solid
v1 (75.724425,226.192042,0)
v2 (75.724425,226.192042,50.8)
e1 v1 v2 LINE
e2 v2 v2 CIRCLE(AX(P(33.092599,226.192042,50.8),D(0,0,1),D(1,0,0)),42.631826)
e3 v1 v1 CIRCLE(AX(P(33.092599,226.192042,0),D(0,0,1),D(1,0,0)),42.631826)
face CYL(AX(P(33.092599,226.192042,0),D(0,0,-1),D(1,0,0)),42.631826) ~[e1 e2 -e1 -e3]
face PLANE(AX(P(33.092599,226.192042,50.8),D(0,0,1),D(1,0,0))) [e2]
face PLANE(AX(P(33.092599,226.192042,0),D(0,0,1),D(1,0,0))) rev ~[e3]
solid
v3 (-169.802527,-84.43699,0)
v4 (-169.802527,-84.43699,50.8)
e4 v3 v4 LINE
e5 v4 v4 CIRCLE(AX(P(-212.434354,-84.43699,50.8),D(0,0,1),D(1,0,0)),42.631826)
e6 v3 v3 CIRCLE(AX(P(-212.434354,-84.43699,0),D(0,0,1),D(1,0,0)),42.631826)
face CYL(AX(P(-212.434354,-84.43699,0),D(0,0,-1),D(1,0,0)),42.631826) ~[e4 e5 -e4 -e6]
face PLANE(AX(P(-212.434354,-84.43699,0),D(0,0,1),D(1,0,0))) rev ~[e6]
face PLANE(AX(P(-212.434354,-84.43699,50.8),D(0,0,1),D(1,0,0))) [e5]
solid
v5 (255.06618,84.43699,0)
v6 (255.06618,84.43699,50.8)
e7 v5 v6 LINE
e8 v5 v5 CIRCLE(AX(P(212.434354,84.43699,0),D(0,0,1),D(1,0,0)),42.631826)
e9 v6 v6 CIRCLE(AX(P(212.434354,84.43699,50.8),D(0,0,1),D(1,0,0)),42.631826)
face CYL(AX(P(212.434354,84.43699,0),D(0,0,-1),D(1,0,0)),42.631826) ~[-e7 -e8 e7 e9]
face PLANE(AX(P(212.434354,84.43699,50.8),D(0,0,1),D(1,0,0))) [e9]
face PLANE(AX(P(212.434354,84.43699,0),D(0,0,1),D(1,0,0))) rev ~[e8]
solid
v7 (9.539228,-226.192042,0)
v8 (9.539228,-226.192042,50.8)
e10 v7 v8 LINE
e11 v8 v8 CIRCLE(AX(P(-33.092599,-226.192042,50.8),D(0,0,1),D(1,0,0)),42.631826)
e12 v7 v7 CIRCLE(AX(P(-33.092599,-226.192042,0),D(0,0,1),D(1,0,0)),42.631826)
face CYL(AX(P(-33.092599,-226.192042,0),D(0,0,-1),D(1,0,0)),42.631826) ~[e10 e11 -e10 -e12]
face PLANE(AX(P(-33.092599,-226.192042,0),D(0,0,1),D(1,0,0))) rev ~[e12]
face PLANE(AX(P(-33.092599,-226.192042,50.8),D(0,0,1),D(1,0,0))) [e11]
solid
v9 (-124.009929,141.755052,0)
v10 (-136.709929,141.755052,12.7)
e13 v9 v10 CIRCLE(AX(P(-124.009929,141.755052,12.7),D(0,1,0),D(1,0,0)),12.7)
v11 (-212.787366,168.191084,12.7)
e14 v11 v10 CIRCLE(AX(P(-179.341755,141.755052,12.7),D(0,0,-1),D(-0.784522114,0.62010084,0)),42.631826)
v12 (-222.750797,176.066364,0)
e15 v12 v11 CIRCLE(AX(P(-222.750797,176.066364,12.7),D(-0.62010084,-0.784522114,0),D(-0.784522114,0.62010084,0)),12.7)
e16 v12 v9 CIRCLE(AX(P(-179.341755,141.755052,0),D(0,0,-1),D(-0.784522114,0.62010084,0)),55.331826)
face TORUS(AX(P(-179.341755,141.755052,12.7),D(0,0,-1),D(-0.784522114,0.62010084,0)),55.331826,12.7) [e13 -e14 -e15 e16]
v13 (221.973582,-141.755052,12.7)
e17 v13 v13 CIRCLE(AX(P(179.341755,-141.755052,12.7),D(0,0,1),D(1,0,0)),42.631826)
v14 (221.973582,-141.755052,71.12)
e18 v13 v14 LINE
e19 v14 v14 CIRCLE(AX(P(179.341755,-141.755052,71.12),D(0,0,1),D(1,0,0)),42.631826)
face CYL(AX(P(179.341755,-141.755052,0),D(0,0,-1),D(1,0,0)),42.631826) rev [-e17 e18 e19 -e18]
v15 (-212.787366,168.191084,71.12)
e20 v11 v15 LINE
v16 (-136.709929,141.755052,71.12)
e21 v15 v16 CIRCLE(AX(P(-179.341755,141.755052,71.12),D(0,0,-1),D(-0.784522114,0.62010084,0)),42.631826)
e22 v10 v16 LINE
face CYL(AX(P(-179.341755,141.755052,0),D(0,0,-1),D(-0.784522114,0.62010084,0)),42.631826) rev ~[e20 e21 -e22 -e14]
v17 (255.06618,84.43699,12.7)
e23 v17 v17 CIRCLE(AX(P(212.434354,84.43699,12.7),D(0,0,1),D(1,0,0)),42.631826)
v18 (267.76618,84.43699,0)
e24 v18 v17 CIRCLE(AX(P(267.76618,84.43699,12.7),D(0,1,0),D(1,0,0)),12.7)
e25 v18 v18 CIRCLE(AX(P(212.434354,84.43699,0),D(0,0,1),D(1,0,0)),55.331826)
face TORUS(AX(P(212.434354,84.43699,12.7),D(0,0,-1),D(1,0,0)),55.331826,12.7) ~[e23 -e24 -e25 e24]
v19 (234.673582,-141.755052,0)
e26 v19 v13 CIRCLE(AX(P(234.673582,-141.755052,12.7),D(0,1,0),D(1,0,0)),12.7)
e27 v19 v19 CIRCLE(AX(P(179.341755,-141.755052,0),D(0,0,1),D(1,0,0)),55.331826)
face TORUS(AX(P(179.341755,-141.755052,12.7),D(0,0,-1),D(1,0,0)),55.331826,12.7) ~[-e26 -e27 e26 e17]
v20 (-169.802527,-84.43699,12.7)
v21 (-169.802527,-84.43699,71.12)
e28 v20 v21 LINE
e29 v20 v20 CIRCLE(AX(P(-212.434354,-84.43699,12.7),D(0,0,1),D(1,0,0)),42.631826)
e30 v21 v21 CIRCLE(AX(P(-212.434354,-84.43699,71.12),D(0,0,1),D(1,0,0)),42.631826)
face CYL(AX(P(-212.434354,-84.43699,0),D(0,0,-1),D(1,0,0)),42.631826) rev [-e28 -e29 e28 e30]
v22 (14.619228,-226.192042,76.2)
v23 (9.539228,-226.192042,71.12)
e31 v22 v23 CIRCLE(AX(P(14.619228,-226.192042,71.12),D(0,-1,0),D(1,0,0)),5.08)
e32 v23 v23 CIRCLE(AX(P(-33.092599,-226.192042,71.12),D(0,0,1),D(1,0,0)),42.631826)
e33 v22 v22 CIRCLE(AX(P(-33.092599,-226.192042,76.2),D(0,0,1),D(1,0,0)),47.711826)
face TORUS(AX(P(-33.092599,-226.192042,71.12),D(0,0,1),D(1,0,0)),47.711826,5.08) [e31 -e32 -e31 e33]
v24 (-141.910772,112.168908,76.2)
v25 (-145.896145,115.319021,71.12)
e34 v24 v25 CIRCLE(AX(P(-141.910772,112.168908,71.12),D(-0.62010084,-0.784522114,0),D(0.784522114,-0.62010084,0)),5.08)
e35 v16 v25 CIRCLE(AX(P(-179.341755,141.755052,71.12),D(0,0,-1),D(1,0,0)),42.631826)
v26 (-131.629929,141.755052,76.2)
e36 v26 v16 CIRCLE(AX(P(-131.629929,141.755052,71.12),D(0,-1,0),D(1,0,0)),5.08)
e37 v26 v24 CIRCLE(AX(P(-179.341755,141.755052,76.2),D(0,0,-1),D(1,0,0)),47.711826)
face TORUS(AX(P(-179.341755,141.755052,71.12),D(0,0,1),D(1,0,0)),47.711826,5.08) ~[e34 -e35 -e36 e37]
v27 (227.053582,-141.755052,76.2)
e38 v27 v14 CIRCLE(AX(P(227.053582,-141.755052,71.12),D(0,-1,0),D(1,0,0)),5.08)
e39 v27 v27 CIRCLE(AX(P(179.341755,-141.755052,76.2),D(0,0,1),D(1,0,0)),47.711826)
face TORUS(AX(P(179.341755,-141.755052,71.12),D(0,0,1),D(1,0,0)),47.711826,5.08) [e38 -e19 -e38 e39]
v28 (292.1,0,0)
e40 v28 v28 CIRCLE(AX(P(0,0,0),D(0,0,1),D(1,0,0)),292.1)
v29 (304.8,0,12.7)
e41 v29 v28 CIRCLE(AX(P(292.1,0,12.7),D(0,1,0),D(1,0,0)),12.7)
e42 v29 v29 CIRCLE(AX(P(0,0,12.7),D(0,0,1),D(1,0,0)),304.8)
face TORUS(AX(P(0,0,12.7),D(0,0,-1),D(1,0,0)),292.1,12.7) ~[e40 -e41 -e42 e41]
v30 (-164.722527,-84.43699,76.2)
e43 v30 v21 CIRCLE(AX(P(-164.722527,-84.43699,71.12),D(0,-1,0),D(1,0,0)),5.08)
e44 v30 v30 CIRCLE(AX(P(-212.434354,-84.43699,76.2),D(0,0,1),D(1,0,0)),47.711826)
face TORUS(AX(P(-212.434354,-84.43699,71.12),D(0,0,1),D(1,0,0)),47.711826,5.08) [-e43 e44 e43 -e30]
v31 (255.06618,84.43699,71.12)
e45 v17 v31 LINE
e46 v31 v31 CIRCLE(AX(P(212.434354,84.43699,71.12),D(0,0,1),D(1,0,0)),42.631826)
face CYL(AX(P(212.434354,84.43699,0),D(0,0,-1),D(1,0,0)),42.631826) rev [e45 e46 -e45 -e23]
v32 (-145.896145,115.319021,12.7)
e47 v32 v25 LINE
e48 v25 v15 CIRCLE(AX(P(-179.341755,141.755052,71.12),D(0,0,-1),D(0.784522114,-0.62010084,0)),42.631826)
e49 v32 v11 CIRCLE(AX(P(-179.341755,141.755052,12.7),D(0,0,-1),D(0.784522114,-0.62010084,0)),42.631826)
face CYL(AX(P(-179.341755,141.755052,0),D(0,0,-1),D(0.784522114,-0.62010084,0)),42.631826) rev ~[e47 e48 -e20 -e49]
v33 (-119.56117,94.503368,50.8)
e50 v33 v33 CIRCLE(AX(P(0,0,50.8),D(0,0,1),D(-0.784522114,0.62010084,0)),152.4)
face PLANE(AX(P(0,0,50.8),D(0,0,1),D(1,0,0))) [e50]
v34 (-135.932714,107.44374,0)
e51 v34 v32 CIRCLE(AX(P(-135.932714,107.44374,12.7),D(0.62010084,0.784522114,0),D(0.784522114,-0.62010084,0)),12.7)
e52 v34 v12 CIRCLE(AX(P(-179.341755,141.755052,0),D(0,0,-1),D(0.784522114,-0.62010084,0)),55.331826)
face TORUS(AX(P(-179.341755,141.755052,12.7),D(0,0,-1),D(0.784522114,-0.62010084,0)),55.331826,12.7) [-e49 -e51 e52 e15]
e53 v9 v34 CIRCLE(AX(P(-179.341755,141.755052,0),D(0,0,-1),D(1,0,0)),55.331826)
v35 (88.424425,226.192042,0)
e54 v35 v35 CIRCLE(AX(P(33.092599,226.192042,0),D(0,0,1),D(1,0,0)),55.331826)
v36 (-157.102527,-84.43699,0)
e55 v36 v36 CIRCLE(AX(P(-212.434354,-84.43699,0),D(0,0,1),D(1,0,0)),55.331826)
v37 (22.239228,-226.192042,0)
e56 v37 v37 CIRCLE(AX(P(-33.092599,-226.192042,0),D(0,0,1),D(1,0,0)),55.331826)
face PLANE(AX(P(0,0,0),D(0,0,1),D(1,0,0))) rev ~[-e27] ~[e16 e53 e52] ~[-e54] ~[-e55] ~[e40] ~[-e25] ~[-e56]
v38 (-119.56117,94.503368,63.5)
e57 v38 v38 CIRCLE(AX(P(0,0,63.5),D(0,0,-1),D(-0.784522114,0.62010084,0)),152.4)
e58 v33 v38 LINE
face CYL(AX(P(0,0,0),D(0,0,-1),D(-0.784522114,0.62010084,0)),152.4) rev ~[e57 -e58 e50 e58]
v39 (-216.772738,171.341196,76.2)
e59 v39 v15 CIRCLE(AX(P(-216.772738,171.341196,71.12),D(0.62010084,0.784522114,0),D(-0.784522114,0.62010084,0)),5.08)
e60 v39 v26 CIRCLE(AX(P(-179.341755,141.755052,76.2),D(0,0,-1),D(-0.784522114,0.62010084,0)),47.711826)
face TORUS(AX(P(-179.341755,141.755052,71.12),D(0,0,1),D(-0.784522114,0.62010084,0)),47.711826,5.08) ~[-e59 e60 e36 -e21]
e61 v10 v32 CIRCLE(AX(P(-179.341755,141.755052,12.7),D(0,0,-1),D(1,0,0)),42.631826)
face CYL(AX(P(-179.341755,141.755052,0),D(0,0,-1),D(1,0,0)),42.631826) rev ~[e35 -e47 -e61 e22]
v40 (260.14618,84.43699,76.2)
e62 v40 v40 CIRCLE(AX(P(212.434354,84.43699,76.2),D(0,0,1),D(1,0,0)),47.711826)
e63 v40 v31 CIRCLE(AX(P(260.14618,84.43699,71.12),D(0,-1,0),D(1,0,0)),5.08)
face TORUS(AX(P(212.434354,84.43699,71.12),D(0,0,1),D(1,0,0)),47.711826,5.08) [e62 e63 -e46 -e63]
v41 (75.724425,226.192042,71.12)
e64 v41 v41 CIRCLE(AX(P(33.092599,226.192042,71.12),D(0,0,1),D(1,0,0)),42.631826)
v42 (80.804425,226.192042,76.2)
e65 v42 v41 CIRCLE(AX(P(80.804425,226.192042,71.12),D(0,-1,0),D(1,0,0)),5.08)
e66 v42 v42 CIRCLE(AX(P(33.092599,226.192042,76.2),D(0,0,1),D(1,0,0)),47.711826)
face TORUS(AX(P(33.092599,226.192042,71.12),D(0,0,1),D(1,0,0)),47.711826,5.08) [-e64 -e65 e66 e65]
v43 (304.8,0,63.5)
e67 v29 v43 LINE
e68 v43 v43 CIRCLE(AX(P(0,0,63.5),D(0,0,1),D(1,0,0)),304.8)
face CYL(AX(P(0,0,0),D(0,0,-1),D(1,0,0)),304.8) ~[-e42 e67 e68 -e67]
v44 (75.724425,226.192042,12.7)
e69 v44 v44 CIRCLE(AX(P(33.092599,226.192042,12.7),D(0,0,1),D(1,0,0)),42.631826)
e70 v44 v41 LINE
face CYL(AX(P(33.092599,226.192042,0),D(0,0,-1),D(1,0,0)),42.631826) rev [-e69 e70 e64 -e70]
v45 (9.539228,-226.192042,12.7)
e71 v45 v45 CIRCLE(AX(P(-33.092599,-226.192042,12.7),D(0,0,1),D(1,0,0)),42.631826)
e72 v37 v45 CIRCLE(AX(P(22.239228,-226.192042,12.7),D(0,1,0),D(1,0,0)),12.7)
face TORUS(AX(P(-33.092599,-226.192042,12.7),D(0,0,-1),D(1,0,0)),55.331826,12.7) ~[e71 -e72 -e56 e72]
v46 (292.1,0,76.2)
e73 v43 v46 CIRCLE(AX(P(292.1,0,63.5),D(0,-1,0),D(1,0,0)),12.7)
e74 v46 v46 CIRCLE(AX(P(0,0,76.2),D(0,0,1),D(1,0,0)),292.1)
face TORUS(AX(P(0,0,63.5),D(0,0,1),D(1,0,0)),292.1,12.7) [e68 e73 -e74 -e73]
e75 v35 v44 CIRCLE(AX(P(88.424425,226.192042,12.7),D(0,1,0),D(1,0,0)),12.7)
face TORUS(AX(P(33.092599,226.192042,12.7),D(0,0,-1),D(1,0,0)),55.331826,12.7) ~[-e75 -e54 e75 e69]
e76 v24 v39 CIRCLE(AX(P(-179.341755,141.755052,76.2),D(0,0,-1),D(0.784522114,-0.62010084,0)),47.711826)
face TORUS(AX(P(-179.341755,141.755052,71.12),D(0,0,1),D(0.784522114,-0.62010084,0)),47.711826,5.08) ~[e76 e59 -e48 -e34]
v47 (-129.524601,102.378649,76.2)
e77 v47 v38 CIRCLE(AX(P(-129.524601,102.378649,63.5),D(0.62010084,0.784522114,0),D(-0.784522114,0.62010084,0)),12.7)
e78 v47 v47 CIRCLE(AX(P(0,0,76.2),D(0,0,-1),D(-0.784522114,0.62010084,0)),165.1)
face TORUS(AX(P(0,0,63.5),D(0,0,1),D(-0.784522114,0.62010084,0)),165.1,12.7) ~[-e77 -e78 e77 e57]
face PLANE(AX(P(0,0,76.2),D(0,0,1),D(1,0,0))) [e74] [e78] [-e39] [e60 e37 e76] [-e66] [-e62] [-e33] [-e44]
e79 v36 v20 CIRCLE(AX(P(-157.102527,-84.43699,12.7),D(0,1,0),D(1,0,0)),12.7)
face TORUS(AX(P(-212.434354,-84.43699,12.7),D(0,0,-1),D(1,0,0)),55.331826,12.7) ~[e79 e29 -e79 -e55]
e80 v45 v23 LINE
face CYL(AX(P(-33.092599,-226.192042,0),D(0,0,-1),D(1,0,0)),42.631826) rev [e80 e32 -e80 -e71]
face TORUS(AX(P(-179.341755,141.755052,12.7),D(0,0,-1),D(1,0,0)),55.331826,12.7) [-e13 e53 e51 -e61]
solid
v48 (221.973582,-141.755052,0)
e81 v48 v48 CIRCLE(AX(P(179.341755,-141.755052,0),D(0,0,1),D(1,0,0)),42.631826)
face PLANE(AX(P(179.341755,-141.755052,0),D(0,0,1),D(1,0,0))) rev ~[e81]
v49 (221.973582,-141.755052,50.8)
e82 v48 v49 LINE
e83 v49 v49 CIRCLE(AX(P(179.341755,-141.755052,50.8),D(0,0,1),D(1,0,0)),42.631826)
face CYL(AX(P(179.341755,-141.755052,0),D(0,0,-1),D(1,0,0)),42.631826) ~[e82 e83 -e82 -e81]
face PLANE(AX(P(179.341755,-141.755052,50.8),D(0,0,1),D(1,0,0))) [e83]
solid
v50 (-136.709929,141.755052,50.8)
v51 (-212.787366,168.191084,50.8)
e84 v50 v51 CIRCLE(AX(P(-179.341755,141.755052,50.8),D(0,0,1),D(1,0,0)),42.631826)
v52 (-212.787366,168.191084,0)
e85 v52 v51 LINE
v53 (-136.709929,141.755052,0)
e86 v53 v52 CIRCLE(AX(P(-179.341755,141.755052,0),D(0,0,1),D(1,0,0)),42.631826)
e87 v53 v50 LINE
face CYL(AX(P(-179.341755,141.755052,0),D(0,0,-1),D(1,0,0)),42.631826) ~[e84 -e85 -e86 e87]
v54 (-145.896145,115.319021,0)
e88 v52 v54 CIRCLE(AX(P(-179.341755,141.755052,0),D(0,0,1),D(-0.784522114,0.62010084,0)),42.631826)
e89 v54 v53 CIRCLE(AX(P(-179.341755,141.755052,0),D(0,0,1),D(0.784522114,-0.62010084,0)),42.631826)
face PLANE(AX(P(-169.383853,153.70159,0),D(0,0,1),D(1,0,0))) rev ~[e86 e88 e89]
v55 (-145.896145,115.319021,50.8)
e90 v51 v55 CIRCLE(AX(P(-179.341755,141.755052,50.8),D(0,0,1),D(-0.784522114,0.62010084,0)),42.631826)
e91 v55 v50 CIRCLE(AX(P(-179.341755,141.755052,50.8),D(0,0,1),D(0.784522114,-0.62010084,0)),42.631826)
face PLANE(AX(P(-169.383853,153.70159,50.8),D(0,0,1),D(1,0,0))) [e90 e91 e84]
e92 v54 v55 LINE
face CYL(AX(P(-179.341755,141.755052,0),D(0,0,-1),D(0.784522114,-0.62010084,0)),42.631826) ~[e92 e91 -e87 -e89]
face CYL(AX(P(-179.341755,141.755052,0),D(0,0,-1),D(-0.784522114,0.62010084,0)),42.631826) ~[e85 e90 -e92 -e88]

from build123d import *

# Parameters (mm, degrees)
F1_DEPTH = 50.8
F0_R     = 42.6318264633
F2_DEPTH = 76.2
F3_R     = 12.7
F4_R     = 5.08


with BuildPart() as f1:
    # F0 (on Top) → F1 (new body)
    with BuildSketch(Plane.XY):
        with BuildLine():
            ThreePointArc((152.4, 0), (50.0231829172, 143.9563863496), (-119.5611702209, 94.5033680638))
            ThreePointArc((-119.5611702209, 94.5033680638), (-50.0231829172, -143.9563863496), (152.4, 0))
        make_face()
    extrude(amount=F1_DEPTH)

    # F0 (on Top) → F2 (join)
    with BuildSketch(Plane.XY):
        with BuildLine():
            ThreePointArc((-239.1223404418, 189.0067361277), (-100.0463658344, -287.9127726992), (304.8, 0))
            ThreePointArc((304.8, 0), (100.0463658344, 287.9127726992), (-239.1223404418, 189.0067361277))
        make_face()
        with Locations((-33.092598564, -226.1920421241)):
            Circle(F0_R, mode=Mode.SUBTRACT)
        with Locations((-212.4343538954, -84.4369900284)):
            Circle(F0_R, mode=Mode.SUBTRACT)
        with Locations((179.3417553314, -141.7550520957)):
            Circle(F0_R, mode=Mode.SUBTRACT)
        with BuildLine():
            ThreePointArc((-145.8961446974, 115.3190206817), (-205.7777867454, 108.3094414618), (-212.7873659653, 168.1910835098))
            ThreePointArc((-212.7873659653, 168.1910835098), (-165.3484505199, 182.0248925232), (-136.709928868, 141.7550520957))
            ThreePointArc((-136.709928868, 141.7550520957), (-139.0719149039, 127.7617472843), (-145.8961446974, 115.3190206817))
        make_face(mode=Mode.SUBTRACT)
        with BuildLine():
            ThreePointArc((152.4, 0), (-50.0231829172, -143.9563863496), (-119.5611702209, 94.5033680638))
            ThreePointArc((-119.5611702209, 94.5033680638), (50.0231829172, 143.9563863496), (152.4, 0))
        make_face(mode=Mode.SUBTRACT)
        with Locations((212.4343538954, 84.4369900284)):
            Circle(F0_R, mode=Mode.SUBTRACT)
        with Locations((33.092598564, 226.1920421241)):
            Circle(F0_R, mode=Mode.SUBTRACT)
    extrude(amount=F2_DEPTH)

    # F3
    f3_edges = [f1.edges().sort_by_distance(p)[0] for p in [
        (-304.8, 0, 76.2),
        (-304.8, 0, 0),
        (-75.724425, -226.192042, 0),
        (-255.06618, -84.43699, 0),
        (136.709929, -141.755052, 0),
        (-221.973582, 141.755052, 0),
        (169.802527, 84.43699, 0),
        (-9.539228, 226.192042, 0),
        (119.56117, -94.503368, 76.2),
    ]]
    fillet(f3_edges, radius=F3_R)

    # F4
    f4_edges = [f1.edges().sort_by_distance(p)[0] for p in [
        (-255.06618, -84.43699, 76.2),
        (-221.973582, 141.755052, 76.2),
        (-9.539228, 226.192042, 76.2),
        (169.802527, 84.43699, 76.2),
        (-75.724425, -226.192042, 76.2),
        (136.709929, -141.755052, 76.2),
    ]]
    fillet(f4_edges, radius=F4_R)


with BuildPart() as f1b:
    # F0 (on Top) → F1, piece 2 (new body)
    with BuildSketch(Plane.XY):
        with Locations((-33.092598564, -226.1920421241)):
            Circle(F0_R)
    extrude(amount=F1_DEPTH)


with BuildPart() as f1c:
    # F0 (on Top) → F1, piece 3 (new body)
    with BuildSketch(Plane.XY):
        with Locations((179.3417553314, -141.7550520957)):
            Circle(F0_R)
    extrude(amount=F1_DEPTH)


with BuildPart() as f1d:
    # F0 (on Top) → F1, piece 4 (new body)
    with BuildSketch(Plane.XY):
        with Locations((212.4343538954, 84.4369900284)):
            Circle(F0_R)
    extrude(amount=F1_DEPTH)


with BuildPart() as f1e:
    # F0 (on Top) → F1, piece 5 (new body)
    with BuildSketch(Plane.XY):
        with Locations((33.092598564, 226.1920421241)):
            Circle(F0_R)
    extrude(amount=F1_DEPTH)


with BuildPart() as f1f:
    # F0 (on Top) → F1, piece 6 (new body)
    with BuildSketch(Plane.XY):
        with BuildLine():
            ThreePointArc((-136.709928868, 141.7550520957), (-165.3484505199, 182.0248925232), (-212.7873659653, 168.1910835098))
            Line((-212.7873659653, 168.1910835098), (-145.8961446974, 115.3190206817))
            ThreePointArc((-145.8961446974, 115.3190206817), (-139.0719149039, 127.7617472843), (-136.709928868, 141.7550520957))
        make_face()
        with BuildLine():
            Line((-145.8961446974, 115.3190206817), (-212.7873659653, 168.1910835098))
            ThreePointArc((-212.7873659653, 168.1910835098), (-205.7777867454, 108.3094414618), (-145.8961446974, 115.3190206817))
        make_face()
    extrude(amount=F1_DEPTH)


with BuildPart() as f1g:
    # F0 (on Top) → F1, piece 7 (new body)
    with BuildSketch(Plane.XY):
        with Locations((-212.4343538954, -84.4369900284)):
            Circle(F0_R)
    extrude(amount=F1_DEPTH)


solid = Compound([f1.part, f1b.part, f1c.part, f1d.part, f1e.part, f1f.part, f1g.part])
